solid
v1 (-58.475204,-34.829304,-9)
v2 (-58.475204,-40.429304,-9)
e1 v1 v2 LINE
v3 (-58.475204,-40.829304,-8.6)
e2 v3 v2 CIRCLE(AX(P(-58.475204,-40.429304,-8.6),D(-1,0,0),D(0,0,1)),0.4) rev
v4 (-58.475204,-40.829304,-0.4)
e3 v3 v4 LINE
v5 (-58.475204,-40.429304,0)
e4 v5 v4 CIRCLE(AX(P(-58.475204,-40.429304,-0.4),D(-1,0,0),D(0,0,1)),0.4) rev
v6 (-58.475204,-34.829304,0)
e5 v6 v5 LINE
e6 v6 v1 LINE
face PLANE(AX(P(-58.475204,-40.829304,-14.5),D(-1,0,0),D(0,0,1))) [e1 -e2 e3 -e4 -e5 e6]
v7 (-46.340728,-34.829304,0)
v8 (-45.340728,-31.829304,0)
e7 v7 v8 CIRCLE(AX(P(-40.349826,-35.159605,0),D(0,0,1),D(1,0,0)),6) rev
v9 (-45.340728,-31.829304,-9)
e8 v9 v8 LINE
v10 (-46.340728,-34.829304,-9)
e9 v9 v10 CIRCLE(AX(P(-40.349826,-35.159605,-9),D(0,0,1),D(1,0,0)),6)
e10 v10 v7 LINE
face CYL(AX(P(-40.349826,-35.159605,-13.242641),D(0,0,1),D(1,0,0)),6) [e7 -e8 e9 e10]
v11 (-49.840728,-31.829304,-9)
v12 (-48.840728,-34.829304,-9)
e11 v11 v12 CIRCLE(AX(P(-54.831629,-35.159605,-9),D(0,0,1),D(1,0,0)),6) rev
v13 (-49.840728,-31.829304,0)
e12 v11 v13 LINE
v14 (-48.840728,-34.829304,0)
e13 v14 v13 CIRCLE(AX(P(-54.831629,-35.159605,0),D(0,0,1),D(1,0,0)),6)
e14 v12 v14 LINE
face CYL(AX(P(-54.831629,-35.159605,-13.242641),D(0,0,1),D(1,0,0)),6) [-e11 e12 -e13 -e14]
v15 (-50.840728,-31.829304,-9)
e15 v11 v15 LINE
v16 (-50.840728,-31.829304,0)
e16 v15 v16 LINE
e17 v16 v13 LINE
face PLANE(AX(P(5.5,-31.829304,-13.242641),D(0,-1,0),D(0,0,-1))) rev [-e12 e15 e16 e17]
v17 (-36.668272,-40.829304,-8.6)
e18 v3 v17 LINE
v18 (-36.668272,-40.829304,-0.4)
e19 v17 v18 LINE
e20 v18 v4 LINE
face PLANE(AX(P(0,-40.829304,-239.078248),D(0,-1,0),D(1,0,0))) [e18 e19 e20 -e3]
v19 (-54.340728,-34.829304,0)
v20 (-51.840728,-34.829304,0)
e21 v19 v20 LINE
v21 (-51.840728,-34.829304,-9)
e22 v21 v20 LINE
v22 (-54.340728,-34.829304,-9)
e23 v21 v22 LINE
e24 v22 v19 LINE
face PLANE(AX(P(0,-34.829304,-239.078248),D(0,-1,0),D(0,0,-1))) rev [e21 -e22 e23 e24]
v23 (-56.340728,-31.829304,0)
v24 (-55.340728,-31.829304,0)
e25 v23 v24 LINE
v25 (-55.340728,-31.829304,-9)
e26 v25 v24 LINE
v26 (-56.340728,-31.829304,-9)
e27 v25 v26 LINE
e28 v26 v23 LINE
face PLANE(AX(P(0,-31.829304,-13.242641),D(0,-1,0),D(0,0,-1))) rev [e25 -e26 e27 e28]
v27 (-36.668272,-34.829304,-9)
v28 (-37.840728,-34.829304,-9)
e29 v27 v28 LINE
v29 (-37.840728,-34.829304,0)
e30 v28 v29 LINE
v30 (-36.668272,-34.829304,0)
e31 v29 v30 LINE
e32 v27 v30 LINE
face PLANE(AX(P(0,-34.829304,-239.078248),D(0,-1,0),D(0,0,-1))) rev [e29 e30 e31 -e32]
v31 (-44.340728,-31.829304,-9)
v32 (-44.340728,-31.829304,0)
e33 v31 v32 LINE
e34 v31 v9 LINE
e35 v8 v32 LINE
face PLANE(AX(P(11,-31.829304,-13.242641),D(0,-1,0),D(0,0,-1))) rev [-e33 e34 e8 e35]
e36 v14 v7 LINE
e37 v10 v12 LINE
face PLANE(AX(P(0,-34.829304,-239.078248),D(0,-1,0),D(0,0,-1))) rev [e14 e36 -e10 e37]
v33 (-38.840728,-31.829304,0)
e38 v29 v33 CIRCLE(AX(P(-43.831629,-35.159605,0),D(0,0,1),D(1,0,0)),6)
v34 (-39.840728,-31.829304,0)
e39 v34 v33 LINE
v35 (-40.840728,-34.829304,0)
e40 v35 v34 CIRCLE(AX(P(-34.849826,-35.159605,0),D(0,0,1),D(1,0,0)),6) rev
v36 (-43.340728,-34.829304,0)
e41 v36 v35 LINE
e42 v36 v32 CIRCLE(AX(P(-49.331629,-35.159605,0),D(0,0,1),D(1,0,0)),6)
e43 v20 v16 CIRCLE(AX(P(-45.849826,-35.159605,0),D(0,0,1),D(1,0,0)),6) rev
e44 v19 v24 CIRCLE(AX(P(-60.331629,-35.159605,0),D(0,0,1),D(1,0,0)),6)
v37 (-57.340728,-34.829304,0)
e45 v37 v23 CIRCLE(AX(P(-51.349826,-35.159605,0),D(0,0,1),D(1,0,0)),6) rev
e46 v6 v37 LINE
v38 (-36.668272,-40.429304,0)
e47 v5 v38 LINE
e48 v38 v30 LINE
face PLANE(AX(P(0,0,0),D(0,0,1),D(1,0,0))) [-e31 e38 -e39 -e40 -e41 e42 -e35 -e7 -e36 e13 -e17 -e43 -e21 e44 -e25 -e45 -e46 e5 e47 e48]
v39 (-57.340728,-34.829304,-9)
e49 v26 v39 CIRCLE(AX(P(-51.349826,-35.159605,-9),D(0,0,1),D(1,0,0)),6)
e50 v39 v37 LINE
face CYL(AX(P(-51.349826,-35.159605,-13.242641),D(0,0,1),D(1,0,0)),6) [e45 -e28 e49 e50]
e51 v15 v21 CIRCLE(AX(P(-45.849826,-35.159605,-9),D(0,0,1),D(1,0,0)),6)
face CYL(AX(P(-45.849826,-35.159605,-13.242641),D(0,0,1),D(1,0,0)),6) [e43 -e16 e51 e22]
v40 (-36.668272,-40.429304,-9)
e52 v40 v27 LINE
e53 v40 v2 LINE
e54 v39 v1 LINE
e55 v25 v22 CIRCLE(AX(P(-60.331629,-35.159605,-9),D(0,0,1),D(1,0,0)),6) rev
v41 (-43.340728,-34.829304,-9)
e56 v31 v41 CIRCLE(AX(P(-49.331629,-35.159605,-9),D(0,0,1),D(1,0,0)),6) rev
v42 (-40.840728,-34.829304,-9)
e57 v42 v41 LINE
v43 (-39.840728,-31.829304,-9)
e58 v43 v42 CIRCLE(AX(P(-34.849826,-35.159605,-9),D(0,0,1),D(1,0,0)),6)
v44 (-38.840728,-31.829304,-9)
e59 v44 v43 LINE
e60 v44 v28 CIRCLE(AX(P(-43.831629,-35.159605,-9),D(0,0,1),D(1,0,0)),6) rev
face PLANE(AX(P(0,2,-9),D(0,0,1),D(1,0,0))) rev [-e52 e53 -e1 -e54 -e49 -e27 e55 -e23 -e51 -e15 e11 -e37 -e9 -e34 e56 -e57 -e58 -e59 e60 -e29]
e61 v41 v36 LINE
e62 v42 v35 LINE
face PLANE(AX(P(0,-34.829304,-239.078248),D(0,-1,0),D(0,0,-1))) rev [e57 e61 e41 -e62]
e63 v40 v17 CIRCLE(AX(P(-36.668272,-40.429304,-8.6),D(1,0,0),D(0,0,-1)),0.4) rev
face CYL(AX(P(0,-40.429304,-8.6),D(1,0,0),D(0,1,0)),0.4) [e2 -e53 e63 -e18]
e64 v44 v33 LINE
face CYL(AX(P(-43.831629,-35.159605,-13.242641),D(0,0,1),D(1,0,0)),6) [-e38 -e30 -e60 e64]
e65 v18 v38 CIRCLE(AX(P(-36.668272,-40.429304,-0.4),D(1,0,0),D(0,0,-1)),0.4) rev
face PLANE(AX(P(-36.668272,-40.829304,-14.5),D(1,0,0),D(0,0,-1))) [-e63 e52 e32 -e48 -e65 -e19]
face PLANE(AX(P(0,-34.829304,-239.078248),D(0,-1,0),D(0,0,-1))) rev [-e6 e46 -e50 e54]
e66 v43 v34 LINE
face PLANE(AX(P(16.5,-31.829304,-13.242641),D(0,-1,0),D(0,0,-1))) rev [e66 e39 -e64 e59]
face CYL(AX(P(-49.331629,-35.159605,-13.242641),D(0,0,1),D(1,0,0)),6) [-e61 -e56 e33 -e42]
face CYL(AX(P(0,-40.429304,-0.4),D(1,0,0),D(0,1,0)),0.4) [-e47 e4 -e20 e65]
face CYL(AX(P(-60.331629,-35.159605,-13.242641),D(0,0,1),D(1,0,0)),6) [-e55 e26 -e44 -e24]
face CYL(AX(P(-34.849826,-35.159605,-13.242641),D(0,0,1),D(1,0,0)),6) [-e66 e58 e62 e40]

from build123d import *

# Parameters (mm, degrees)
SKETCH1_W                 = 230
SKETCH1_H                 = 6
BOSS_EXTRUDE1_DEPTH       = 9
BOSS_EXTRUDE2_DEPTH       = 9
LPATTERN1_COUNT           = 41
LPATTERN1_PITCH           = 5.5
SKETCH2_W                 = 15
SKETCH2_H                 = 20
BOSS_EXTRUDE3_DEPTH       = 5
FILLET1_R                 = 10
FILLET2_R                 = 3
SKETCH3_W                 = 13
SKETCH3_H                 = 8
BOSS_EXTRUDE4_DEPTH       = 5
SKETCH4_W                 = 3
SKETCH4_H                 = 8
BOSS_EXTRUDE5_DEPTH       = 5
FILLET3_R                 = 0.4
F_3_0MM_DOWEL_HOLE1_D     = 2.7
F_3_0MM_DOWEL_HOLE1_DEPTH = 7
F_3_0MM_DOWEL_HOLE1_TIP   = 0.811161836
SKETCH6_W                 = 22.006931309
SKETCH6_H                 = 16.378230192
SKETCH6_W_2               = 21.806931309
SKETCH6_H_2               = 16.178230192
CUT_EXTRUDE1_DEPTH        = 180.611613715


with BuildPart() as part:
    # Sketch1 → Boss-Extrude1 (new body)
    with BuildSketch(Plane.XY):
        with Locations((54.307342656, -37.82930415)):
            Rectangle(SKETCH1_W, SKETCH1_H)
    extrude(amount=-BOSS_EXTRUDE1_DEPTH)

    # Sketch1<3> → Boss-Extrude2 (add)
    with BuildSketch(Plane.XY):
        with BuildLine():
            ThreePointArc((-56.340727793, -31.82930415), (-57.041926016, -33.262238075), (-57.340727793, -34.82930415))
            Line((-57.340727793, -34.82930415), (-54.340727793, -34.82930415))
            ThreePointArc((-54.340727793, -34.82930415), (-54.63952957, -33.262238075), (-55.340727793, -31.82930415))
            Line((-55.340727793, -31.82930415), (-56.340727793, -31.82930415))
        make_face()
    boss_extrude2 = extrude(amount=-BOSS_EXTRUDE2_DEPTH)

    # LPattern1: Boss-Extrude2 ×41
    with Locations(*[(i * LPATTERN1_PITCH, 0, 0) for i in range(1, LPATTERN1_COUNT)]):
        add(boss_extrude2)

    # Sketch2 → Boss-Extrude3 (add)
    with BuildSketch(Plane.XZ.offset(40.82930415)):
        with Locations((-68.192657344, -4.5)):
            Rectangle(SKETCH2_W, SKETCH2_H)
    extrude(amount=-BOSS_EXTRUDE3_DEPTH)

    # Fillet1
    # the kernel refuses this fillet: 10 mm, written as the material it adds along each edge
    with BuildSketch(Plane(origin=(-60.692657344, -35.82930415, 0), x_dir=(0, 1, 0), z_dir=(0, 0, -1))) as fillet1_piece_1:
        with BuildLine():
            CenterArc((10, -4.358898944), FILLET1_R, 154.158067237, 25.841932763)
            Line((0, -4.358898944), (0, 0))
            Line((0, 0), (1, 0))
        make_face()
    extrude(amount=9)

    # Fillet2
    fillet2_edges = [part.edges().sort_by_distance(p)[0] for p in [
        (-60.692657344, -38.32930415, 5.5),
        (-60.692657344, -38.32930415, -14.5),
        (-75.692657344, -38.32930415, -14.5),
        (-75.692657344, -38.32930415, 5.5),
    ]]
    fillet(fillet2_edges, radius=FILLET2_R)

    # Sketch3 → Boss-Extrude4 (add)
    with BuildSketch(Plane(origin=(169.307342656, 0, 0), x_dir=(0, 0, -1), z_dir=(1, 0, 0))):
        with Locations((4.5, -36.82930415)):
            Rectangle(SKETCH3_W, SKETCH3_H)
    extrude(amount=BOSS_EXTRUDE4_DEPTH)

    # Sketch4 → Boss-Extrude5 (add)
    with BuildSketch(Plane.XY.offset(2)):
        with Locations((170.807342656, -36.82930415)):
            Rectangle(SKETCH4_W, SKETCH4_H)
    extrude(amount=BOSS_EXTRUDE5_DEPTH)

    # Fillet3
    fillet3_edges = [part.edges().sort_by_distance(p)[0] for p in [
        (54.307342656, -40.82930415, -9),
        (-60.692657344, -40.82930415, 1.25),
        (-68.192657344, -40.82930415, -14.5),
        (-68.192657344, -40.82930415, 5.5),
        (-75.692657344, -40.82930415, -4.5),
        (-60.692657344, -40.82930415, -10.25),
        (-61.571337, -40.82930415, 4.621320344),
        (-74.813977688, -40.82930415, 4.621320344),
        (-74.813977688, -40.82930415, -13.621320344),
        (-61.571337, -40.82930415, -13.621320344),
        (173.307342656, -32.82930415, 2),
        (169.307342656, -40.82930415, 3.5),
        (169.307342656, -40.82930415, -10),
        (173.307342656, -40.82930415, 2),
        (171.807342656, -40.82930415, -11),
        (169.307342656, -32.82930415, -2),
        (171.807342656, -32.82930415, -11),
        (174.307342656, -36.82930415, 2),
        (174.307342656, -40.82930415, -4.5),
        (174.307342656, -36.82930415, -11),
        (174.307342656, -32.82930415, -4.5),
        (172.307342656, -36.82930415, 2),
        (172.307342656, -40.82930415, 4.5),
        (172.307342656, -32.82930415, 4.5),
        (169.307342656, -36.82930415, 7),
        (170.807342656, -40.82930415, 7),
        (172.307342656, -36.82930415, 7),
        (170.807342656, -32.82930415, 7),
        (54.307342656, -40.82930415, 0),
    ]]
    fillet(fillet3_edges, radius=FILLET3_R)

    # Ø3.0mm Dowel Hole1
    with Locations(Plane(origin=(-65.692657344, -40.82930415, 1.5), x_dir=(0, 0, -1), z_dir=(0, -1, 0))):
        with Locations((0, 0), (12, 0), (5.991996797, -6)):
            Hole(F_3_0MM_DOWEL_HOLE1_D / 2, depth=F_3_0MM_DOWEL_HOLE1_DEPTH)
            with Locations((0, 0, -(F_3_0MM_DOWEL_HOLE1_DEPTH + F_3_0MM_DOWEL_HOLE1_TIP / 2))):  # 118° drill point
                Cone(0, F_3_0MM_DOWEL_HOLE1_D / 2, F_3_0MM_DOWEL_HOLE1_TIP, mode=Mode.SUBTRACT)

    # Sketch6 → Cut-Extrude1 (cut, through all)
    with BuildSketch(Plane.XY):
        with Locations((-47.571737998, -32.740189054)):
            Rectangle(SKETCH6_W, SKETCH6_H)
        with Locations((-47.571737998, -32.740189054)):
            Rectangle(SKETCH6_W_2, SKETCH6_H_2, mode=Mode.SUBTRACT)
    extrude(amount=-CUT_EXTRUDE1_DEPTH, mode=Mode.SUBTRACT)


with BuildPart() as cut_extrude1_piece_1:
    # of the separate pieces the step leaves, piece 1, a body of its own (cut_extrude1_pieces)
    add(part.part.solids().sort_by_distance((-36.568272343, -40.82930415, -8.6))[0])


with BuildPart() as cut_extrude1_piece_2:
    # of the separate pieces the step leaves, piece 2, a body of its own (cut_extrude1_pieces)
    add(part.part.solids().sort_by_distance((-58.575203652, -40.82930415, -0.4))[0])


with BuildPart() as cut_extrude1_piece_3:
    # of the separate pieces the step leaves, piece 3, a body of its own (cut_extrude1_pieces)
    add(part.part.solids().sort_by_distance((-58.475203652, -40.82930415, -8.6))[0])


solid = cut_extrude1_piece_3.part
